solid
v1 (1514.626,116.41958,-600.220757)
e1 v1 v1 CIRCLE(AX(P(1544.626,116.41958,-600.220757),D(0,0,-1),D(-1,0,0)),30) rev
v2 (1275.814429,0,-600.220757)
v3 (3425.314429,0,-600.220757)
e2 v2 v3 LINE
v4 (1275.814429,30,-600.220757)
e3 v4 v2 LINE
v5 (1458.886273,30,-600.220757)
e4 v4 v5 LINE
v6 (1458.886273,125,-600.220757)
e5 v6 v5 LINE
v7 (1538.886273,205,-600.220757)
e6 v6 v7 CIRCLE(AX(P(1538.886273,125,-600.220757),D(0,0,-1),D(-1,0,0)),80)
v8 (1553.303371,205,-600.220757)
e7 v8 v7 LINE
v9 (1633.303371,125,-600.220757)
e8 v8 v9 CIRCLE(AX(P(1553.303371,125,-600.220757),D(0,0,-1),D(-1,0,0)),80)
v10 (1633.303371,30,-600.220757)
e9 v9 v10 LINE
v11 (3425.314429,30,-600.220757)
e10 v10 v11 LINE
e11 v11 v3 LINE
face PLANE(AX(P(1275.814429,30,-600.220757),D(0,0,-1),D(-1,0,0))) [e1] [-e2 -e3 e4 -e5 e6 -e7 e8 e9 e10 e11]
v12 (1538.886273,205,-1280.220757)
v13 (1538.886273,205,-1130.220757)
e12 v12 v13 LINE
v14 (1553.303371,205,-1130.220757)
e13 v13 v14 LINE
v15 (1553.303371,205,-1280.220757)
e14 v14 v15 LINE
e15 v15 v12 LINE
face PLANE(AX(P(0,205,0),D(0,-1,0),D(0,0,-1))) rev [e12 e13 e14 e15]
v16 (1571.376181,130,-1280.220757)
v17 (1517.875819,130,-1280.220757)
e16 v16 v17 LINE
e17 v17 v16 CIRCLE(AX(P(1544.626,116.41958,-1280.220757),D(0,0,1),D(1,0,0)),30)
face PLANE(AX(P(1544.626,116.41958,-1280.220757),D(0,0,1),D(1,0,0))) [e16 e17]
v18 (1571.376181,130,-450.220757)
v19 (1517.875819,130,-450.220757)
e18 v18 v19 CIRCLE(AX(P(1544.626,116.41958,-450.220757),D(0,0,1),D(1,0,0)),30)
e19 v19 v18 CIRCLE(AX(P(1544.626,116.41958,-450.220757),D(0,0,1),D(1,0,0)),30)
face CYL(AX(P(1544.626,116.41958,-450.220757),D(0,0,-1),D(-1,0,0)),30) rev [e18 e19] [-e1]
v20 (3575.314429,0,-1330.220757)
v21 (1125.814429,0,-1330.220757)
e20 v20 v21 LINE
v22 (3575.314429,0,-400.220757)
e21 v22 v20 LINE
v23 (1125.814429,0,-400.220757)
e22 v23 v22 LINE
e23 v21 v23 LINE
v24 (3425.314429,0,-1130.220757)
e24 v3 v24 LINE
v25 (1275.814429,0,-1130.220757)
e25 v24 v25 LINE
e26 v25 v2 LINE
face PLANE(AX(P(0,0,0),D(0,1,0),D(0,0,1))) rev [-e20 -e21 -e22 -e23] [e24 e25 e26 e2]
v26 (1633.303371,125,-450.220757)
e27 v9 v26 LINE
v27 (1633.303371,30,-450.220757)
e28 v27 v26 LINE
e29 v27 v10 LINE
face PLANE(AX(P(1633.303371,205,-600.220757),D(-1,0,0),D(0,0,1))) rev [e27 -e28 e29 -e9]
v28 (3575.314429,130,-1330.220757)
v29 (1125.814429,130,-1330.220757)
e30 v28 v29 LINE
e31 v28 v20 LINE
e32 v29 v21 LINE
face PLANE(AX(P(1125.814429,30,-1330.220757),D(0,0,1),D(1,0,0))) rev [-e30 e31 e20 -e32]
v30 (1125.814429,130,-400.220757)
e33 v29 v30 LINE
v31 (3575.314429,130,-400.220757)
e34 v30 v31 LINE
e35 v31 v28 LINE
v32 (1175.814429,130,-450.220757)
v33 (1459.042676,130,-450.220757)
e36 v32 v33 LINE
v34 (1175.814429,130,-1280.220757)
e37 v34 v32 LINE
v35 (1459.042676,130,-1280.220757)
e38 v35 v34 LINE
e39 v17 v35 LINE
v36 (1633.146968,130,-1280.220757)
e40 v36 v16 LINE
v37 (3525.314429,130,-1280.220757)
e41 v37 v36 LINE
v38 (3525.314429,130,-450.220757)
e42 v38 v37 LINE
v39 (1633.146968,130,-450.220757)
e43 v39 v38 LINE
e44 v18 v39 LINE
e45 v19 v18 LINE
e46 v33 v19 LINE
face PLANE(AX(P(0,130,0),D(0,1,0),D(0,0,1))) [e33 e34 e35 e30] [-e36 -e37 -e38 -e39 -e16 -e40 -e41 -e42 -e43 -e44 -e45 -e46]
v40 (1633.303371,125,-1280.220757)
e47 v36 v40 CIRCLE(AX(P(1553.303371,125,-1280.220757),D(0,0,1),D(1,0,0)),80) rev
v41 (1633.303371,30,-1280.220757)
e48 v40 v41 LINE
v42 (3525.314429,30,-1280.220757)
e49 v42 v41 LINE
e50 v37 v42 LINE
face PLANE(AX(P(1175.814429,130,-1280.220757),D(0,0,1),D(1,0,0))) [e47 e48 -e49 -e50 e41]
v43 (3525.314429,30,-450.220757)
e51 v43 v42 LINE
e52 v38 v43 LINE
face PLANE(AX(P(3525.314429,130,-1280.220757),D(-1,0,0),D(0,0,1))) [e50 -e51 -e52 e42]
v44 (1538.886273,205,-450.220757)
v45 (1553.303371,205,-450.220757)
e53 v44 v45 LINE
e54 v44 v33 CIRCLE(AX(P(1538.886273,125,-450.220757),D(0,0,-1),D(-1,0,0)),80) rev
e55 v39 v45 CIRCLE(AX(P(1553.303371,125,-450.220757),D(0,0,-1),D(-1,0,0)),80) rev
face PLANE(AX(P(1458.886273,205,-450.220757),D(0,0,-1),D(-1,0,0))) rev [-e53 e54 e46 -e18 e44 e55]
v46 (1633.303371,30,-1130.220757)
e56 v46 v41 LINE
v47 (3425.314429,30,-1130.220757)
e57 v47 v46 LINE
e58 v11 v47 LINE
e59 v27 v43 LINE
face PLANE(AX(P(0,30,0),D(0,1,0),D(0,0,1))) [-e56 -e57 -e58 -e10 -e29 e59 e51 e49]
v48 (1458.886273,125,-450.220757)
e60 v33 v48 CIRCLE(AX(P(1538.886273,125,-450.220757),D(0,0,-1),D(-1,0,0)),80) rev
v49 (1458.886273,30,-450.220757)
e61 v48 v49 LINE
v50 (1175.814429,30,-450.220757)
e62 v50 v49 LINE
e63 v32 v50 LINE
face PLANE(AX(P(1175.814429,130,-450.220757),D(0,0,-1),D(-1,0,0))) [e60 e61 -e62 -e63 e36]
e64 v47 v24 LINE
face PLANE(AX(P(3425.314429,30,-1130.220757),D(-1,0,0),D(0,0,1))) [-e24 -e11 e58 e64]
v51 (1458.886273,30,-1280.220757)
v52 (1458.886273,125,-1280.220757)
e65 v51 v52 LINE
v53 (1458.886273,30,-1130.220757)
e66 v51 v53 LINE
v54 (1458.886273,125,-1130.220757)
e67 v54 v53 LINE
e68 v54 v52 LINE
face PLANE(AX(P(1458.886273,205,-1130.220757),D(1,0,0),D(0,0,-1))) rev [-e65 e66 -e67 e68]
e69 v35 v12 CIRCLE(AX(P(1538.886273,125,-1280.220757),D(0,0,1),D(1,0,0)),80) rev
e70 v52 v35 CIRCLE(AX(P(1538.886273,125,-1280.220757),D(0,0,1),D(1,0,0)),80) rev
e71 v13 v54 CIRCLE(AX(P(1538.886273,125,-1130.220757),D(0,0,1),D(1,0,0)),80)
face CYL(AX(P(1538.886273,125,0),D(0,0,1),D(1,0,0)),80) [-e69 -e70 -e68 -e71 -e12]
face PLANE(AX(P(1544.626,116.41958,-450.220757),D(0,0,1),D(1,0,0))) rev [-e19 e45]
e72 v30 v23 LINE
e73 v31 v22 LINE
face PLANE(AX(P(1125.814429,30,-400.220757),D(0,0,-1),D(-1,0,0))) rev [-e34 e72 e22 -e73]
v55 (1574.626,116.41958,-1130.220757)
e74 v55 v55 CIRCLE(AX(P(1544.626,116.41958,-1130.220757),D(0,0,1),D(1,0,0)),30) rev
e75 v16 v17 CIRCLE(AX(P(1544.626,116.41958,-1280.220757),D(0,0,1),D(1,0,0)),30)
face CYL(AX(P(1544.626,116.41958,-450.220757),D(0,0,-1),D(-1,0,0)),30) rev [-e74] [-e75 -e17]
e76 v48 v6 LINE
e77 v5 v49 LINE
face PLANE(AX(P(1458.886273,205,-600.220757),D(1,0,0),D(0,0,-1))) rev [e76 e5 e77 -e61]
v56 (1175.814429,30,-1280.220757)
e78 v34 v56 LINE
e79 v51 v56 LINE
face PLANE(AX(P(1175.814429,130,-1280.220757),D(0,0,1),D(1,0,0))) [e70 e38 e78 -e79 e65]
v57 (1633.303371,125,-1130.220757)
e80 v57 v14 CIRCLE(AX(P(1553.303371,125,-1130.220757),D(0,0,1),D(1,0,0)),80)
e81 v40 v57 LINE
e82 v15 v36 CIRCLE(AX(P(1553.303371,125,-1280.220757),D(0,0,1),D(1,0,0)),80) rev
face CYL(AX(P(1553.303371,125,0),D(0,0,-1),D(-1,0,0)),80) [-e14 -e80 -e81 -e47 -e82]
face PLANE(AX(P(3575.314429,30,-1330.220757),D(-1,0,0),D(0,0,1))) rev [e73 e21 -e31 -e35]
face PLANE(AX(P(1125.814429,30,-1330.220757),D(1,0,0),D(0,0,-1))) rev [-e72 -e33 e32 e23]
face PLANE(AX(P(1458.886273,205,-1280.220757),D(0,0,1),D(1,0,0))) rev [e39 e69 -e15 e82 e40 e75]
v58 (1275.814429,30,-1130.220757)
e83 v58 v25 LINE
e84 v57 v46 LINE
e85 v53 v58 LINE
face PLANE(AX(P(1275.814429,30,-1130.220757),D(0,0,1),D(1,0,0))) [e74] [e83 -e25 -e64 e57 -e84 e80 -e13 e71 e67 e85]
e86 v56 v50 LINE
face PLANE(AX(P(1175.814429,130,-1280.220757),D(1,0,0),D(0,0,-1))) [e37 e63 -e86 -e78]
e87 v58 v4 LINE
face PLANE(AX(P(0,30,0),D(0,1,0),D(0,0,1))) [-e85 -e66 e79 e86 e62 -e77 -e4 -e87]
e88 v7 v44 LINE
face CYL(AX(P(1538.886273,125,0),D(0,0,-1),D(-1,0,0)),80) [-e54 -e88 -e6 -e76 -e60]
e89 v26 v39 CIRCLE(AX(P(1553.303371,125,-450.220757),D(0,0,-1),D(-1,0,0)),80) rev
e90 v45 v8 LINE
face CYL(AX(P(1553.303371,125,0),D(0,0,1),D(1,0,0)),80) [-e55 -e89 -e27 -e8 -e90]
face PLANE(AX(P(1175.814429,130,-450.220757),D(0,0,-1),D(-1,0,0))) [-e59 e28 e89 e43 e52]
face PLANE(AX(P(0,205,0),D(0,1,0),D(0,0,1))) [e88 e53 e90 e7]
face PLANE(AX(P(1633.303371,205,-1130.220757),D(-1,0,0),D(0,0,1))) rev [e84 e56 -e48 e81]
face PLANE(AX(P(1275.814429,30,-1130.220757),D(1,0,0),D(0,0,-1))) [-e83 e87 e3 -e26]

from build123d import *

# Parameters (mm, degrees)
SKETCH4_W               = 2449.5
SKETCH4_H               = 930
SKETCH4_W_2             = 2149.5
SKETCH4_H_2             = 530
BOSS_EXTRUDE2_DEPTH     = 30
SKETCH6_W               = 2449.5
SKETCH6_H               = 930
SKETCH6_W_2             = 2349.5
SKETCH6_H_2             = 830
BOSS_EXTRUDE3_DEPTH     = 100
SKETCH8_W               = 174.417097876
SKETCH8_H               = 150
BOSS_EXTRUDE4_DEPTH     = 175
CUT_EXTRUDE1_DEPTH      = 680
CUT_EXTRUDE1_DEPTH_BACK = 150
SKETCH10_R              = 30
FILLET1_R               = 80


with BuildPart() as part:
    # Sketch4 → Boss-Extrude2 (new body)
    with BuildSketch(Plane(origin=(0, 0, 0), x_dir=(1, 0, 0), z_dir=(0, 1, 0))):
        with Locations((2350.564429087, 865.22075714)):
            Rectangle(SKETCH4_W, SKETCH4_H)
        with Locations((2350.564429087, 865.22075714)):
            Rectangle(SKETCH4_W_2, SKETCH4_H_2, mode=Mode.SUBTRACT)
    extrude(amount=BOSS_EXTRUDE2_DEPTH)

    # Sketch6 → Boss-Extrude3 (add)
    with BuildSketch(Plane(origin=(0, 30, 0), x_dir=(1, 0, 0), z_dir=(0, 1, 0))):
        with Locations((2350.564429087, 865.22075714)):
            Rectangle(SKETCH6_W, SKETCH6_H)
        with Locations((2350.564429087, 865.22075714)):
            Rectangle(SKETCH6_W_2, SKETCH6_H_2, mode=Mode.SUBTRACT)
    extrude(amount=BOSS_EXTRUDE3_DEPTH)

    # Sketch8 → Boss-Extrude4 (add)
    with BuildSketch(Plane(origin=(0, 30, 0), x_dir=(1, 0, 0), z_dir=(0, 1, 0))):
        with Locations((1546.094821657, 1205.22075714)):
            Rectangle(SKETCH8_W, SKETCH8_H)
        with Locations((1546.094821657, 525.22075714)):
            Rectangle(SKETCH8_W, SKETCH8_H)
    extrude(amount=BOSS_EXTRUDE4_DEPTH)

    # Sketch10 → Cut-Extrude1 (cut, two sides: drawn at the far end of the back side and taken through both)
    with BuildSketch(Plane.XY.offset(-1130.22075714).offset(-CUT_EXTRUDE1_DEPTH_BACK)):
        with Locations(Location((1544.625999864, 116.419579706, 0), (0, 0, 180))):
            Circle(SKETCH10_R)
    extrude(amount=CUT_EXTRUDE1_DEPTH + CUT_EXTRUDE1_DEPTH_BACK, mode=Mode.SUBTRACT)

    # Fillet1
    # the kernel refuses this fillet: 80 mm, written as the material it takes off along each edge
    with BuildSketch(Plane(origin=(1633.303370595, 205, -1280.22075714), x_dir=(0, -1, 0), z_dir=(0, 0, 1)), Plane(origin=(1458.886272719, 205, -450.22075714), x_dir=(0, -1, 0), z_dir=(0, 0, -1))) as fillet1_piece_1:
        with BuildLine():
            CenterArc((FILLET1_R, -FILLET1_R), FILLET1_R, 90, 90)
            Line((0, -FILLET1_R), (0, 0))
            Line((0, 0), (FILLET1_R, 0))
        make_face()
    extrude(amount=350, mode=Mode.SUBTRACT)
    with BuildSketch(Plane(origin=(1458.886272719, 205, -930.22075714), x_dir=(1, 0, 0), z_dir=(0, 0, -1)), Plane(origin=(1633.303370595, 205, -800.22075714), x_dir=(-1, 0, 0), z_dir=(0, 0, 1))) as fillet1_piece_2:
        with BuildLine():
            CenterArc((FILLET1_R, FILLET1_R), FILLET1_R, 180, 90)
            Line((0, FILLET1_R), (0, 0))
            Line((0, 0), (FILLET1_R, 0))
        make_face()
    extrude(amount=350, mode=Mode.SUBTRACT)


solid = part.part
